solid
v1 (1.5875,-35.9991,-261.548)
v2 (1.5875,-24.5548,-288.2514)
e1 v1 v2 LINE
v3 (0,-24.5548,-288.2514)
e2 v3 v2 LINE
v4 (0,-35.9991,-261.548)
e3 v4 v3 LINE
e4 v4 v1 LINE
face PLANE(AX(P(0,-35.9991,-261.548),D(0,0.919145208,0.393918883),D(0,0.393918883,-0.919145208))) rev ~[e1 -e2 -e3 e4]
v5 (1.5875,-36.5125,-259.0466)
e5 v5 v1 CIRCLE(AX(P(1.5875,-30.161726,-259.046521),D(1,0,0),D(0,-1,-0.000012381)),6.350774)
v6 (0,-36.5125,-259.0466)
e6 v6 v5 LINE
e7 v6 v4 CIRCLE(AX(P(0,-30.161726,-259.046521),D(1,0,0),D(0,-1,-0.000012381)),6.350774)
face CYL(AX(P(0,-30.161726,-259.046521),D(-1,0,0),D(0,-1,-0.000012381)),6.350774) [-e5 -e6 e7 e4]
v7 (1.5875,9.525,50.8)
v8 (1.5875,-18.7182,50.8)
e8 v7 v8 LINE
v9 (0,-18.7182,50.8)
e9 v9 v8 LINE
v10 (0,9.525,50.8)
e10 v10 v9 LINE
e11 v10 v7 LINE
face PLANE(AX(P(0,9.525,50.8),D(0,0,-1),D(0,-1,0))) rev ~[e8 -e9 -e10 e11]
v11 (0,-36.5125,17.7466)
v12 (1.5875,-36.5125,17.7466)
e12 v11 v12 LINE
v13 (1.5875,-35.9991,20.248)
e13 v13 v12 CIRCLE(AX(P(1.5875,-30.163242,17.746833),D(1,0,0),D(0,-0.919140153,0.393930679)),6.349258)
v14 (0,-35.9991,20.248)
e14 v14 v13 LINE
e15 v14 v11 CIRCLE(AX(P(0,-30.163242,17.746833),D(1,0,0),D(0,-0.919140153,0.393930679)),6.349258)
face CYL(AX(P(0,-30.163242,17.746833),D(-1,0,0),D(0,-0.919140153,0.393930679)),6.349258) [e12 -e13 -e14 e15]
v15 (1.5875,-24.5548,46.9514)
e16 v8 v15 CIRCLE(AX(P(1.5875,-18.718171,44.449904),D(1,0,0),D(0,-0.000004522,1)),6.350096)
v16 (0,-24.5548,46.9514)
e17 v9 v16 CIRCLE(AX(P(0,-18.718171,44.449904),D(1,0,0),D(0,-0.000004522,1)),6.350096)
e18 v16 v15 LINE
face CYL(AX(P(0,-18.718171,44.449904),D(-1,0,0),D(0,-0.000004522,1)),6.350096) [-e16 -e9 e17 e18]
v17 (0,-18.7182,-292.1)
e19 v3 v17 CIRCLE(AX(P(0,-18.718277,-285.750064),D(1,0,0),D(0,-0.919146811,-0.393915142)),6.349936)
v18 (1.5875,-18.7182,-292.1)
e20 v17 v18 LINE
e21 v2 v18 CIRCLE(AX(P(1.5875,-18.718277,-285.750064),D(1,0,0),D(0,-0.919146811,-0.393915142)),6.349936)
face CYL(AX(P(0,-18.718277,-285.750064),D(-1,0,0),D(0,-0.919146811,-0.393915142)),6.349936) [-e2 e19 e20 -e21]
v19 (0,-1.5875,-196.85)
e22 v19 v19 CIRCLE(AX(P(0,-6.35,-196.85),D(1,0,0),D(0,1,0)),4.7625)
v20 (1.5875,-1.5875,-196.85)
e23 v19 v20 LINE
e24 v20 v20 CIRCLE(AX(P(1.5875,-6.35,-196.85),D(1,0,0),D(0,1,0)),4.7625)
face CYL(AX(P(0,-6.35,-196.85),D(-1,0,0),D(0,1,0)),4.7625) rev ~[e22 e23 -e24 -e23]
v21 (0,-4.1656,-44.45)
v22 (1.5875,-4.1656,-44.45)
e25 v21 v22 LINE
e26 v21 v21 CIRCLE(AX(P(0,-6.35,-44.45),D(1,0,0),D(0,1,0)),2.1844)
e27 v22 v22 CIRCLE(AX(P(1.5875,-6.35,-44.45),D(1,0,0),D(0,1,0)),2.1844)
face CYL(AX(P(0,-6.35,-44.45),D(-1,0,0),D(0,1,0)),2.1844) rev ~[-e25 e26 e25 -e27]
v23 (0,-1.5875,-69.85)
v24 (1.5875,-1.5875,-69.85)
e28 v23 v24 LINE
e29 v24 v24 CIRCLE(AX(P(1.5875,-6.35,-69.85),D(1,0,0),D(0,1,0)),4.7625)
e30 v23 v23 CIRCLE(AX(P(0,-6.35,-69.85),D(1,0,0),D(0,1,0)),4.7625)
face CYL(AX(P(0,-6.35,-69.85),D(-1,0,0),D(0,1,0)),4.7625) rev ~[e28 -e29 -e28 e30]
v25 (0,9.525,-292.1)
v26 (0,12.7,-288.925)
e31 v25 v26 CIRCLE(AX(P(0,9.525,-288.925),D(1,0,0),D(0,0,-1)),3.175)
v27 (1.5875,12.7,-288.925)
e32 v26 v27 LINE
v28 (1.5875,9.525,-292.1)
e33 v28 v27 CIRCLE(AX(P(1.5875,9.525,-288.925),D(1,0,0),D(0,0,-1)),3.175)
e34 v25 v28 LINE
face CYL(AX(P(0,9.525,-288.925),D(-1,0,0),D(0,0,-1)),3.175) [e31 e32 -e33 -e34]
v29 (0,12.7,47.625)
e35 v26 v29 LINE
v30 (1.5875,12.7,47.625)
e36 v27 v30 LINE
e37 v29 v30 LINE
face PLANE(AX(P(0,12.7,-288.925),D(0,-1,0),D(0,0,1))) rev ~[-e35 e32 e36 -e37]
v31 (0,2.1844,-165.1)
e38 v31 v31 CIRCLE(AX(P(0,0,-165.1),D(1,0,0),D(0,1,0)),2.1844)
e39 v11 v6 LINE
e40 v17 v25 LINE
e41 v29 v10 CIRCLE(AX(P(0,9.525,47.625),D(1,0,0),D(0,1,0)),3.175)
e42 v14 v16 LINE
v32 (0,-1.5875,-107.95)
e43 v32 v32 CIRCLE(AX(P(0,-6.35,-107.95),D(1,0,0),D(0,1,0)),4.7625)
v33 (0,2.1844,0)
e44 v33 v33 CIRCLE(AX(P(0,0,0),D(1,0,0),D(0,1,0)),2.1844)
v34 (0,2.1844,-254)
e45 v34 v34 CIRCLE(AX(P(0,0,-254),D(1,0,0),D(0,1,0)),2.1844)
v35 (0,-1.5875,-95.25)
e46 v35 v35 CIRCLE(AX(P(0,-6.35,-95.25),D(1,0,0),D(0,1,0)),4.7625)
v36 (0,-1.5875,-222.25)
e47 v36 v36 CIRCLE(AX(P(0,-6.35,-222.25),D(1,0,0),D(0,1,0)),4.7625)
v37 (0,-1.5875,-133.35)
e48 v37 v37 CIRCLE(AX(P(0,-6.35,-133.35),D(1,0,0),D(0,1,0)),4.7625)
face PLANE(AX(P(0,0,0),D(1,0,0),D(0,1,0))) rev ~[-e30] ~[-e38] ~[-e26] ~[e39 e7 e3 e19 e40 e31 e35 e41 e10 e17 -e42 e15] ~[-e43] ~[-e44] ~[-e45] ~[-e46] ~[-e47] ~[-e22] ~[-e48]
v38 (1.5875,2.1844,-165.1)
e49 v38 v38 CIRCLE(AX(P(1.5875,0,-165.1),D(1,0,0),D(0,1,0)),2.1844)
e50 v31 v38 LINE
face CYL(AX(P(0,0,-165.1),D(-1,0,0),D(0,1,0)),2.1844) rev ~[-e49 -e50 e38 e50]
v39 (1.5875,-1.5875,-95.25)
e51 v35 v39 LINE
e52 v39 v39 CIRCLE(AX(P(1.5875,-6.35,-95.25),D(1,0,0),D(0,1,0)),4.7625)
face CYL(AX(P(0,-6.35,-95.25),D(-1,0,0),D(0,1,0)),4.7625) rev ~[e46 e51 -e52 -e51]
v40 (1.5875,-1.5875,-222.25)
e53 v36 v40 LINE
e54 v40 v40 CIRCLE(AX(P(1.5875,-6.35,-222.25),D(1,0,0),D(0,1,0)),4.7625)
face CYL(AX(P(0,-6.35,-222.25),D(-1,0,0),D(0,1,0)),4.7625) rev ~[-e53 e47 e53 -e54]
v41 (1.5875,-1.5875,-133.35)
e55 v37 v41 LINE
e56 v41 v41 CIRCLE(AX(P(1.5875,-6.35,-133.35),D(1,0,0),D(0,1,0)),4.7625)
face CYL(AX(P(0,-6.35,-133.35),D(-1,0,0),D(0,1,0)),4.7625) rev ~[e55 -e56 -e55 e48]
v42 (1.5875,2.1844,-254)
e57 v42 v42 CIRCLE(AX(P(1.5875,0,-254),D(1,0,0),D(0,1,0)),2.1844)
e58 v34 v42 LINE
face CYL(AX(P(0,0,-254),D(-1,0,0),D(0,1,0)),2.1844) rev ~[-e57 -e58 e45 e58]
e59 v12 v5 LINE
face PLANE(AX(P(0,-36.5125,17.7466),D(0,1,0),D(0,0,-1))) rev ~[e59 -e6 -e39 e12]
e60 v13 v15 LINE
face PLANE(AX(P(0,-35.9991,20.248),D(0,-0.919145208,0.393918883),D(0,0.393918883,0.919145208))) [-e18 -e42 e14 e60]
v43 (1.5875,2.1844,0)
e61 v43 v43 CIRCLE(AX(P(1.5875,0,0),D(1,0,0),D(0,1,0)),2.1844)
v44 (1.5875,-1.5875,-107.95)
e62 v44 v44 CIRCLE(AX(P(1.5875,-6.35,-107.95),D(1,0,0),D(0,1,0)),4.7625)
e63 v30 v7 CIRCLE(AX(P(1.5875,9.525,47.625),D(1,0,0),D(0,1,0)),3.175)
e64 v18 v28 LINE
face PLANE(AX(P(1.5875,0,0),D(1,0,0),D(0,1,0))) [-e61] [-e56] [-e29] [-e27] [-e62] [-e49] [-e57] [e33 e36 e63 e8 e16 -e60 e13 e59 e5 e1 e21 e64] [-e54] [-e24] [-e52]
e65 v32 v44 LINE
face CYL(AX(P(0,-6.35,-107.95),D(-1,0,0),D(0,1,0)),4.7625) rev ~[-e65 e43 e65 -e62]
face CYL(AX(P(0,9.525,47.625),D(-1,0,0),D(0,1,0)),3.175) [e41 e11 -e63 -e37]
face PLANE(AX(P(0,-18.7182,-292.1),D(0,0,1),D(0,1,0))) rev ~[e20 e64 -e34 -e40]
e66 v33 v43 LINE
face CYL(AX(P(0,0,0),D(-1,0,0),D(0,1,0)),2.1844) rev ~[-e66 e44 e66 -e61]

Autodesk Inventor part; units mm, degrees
ref_plane "YZ Plane" through (0, 0, 0) normal (1, 0, 0) x (0, 1, 0)
ref_plane "XZ Plane" through (0, 0, 0) normal (0, 1, 0) x (-1, 0, 0)
ref_plane "XY Plane" through (0, 0, 0) normal (0, 0, 1) x (1, 0, 0)
sketch "skirt" plane through (0, 0, 0) normal (0, 0, 1) x (1, 0, 0)
  circle A0 centre (5.0031, 25.9038) radius 4.7625
  line L0 (24.0531, -155.0712) -> (24.0531, 181.4788)
  line L1 (-25.1594, 151.6004) -> (-25.1594, -125.1928)
  circle A1 centre (11.3531, 133.8538) radius 2.1844
  arc A2 (24.0531, 181.4788) -> (20.8781, 184.6538) centre (20.8781, 181.4788) ccw
  line L2 (20.8781, 184.6538) -> (-7.3651, 184.6538)
  line L3 (-24.646, 154.1018) -> (-13.2017, 180.8052)
  arc A3 (-7.3651, 184.6538) -> (-13.2017, 180.8052) centre (-7.3651, 178.3038) ccw
  arc A4 (-24.646, 154.1018) -> (-25.1594, 151.6004) centre (-18.8094, 151.6004) ccw
  line L4 (-24.646, -127.6942) -> (-13.2017, -154.3976)
  line L5 (-7.3651, -158.2462) -> (20.8781, -158.2462)
  arc A5 (20.8781, -158.2462) -> (24.0531, -155.0712) centre (20.8781, -155.0712) ccw
  arc A6 (-25.1594, -125.1928) -> (-24.646, -127.6942) centre (-18.8094, -125.1928) ccw
  circle A7 centre (11.3531, -120.1462) radius 2.1844
  arc A8 (-13.2017, -154.3976) -> (-7.3651, -158.2462) centre (-7.3651, -151.8962) ccw
  circle A9 centre (5.0031, 64.0038) radius 4.7625
  circle A10 centre (5.0031, 38.6038) radius 4.7625
  circle A11 centre (5.0031, 0.5038) radius 4.7625
  circle A12 centre (11.3531, -31.2462) radius 2.1844
  circle A13 centre (5.0031, -62.9962) radius 4.7625
  circle A14 centre (5.0031, -88.3962) radius 4.7625
  circle A15 centre (5.0031, 89.4038) radius 2.1844
  point P0 (-0.9322, -0.2017)
  point P1 (5.0031, 51.3038)
  point P2 (-25.1594, 152.9038)
  point P3 (-25.1594, -126.4962)
  point P4 (5.0031, -12.1962)
  point P5 (5.0031, 13.2038)
  dimension "d0" = 279.4
  dimension "d1" = 49.2125
  dimension "d2" = 3.175
  dimension "d3" = 113.199
  dimension "d4" = 113.199
  dimension "d5" = 6.35
  dimension "d7" = 9.525
  dimension "d13" = 50.8
  dimension "d14" = 38.1
  dimension "d16" = 4.3688
  dimension "d17" = 31.75
  dimension "d18" = 4.3688
sketch "Sketch1" plane through (0, 0, 0) normal (1, 0, 0) x (0, 1, 0)
  circle A0 centre (-6.35, -107.95) radius 4.7625
  line L0 (12.7, -288.925) -> (12.7, 47.625)
  line L1 (-36.5125, 17.7466) -> (-36.5125, -259.0466)
  circle A1 centre (0, 0) radius 2.1844
  arc A2 (12.7, 47.625) -> (9.525, 50.8) centre (9.525, 47.625) ccw
  line L2 (9.525, 50.8) -> (-18.7182, 50.8)
  line L3 (-35.9991, 20.248) -> (-24.5548, 46.9514)
  arc A3 (-18.7182, 50.8) -> (-24.5548, 46.9514) centre (-18.7182, 44.45) ccw
  arc A4 (-35.9991, 20.248) -> (-36.5125, 17.7466) centre (-30.1625, 17.7466) ccw
  line L4 (-35.9991, -261.548) -> (-24.5548, -288.2514)
  line L5 (-18.7182, -292.1) -> (9.525, -292.1)
  arc A5 (9.525, -292.1) -> (12.7, -288.925) centre (9.525, -288.925) ccw
  arc A6 (-36.5125, -259.0466) -> (-35.9991, -261.548) centre (-30.1625, -259.0466) ccw
  circle A7 centre (0, -254) radius 2.1844
  arc A8 (-24.5548, -288.2514) -> (-18.7182, -292.1) centre (-18.7182, -285.75) ccw
  circle A9 centre (-6.35, -69.85) radius 4.7625
  circle A10 centre (-6.35, -95.25) radius 4.7625
  circle A11 centre (-6.35, -133.35) radius 4.7625
  circle A12 centre (0, -165.1) radius 2.1844
  circle A13 centre (-6.35, -196.85) radius 4.7625
  circle A14 centre (-6.35, -222.25) radius 4.7625
  circle A15 centre (-6.35, -44.45) radius 2.1844
extrude "Extrusion1" add sketch "Sketch1" along normal blind 1.5875
properties part number "Skirt" material "Acetal Resin, White"
